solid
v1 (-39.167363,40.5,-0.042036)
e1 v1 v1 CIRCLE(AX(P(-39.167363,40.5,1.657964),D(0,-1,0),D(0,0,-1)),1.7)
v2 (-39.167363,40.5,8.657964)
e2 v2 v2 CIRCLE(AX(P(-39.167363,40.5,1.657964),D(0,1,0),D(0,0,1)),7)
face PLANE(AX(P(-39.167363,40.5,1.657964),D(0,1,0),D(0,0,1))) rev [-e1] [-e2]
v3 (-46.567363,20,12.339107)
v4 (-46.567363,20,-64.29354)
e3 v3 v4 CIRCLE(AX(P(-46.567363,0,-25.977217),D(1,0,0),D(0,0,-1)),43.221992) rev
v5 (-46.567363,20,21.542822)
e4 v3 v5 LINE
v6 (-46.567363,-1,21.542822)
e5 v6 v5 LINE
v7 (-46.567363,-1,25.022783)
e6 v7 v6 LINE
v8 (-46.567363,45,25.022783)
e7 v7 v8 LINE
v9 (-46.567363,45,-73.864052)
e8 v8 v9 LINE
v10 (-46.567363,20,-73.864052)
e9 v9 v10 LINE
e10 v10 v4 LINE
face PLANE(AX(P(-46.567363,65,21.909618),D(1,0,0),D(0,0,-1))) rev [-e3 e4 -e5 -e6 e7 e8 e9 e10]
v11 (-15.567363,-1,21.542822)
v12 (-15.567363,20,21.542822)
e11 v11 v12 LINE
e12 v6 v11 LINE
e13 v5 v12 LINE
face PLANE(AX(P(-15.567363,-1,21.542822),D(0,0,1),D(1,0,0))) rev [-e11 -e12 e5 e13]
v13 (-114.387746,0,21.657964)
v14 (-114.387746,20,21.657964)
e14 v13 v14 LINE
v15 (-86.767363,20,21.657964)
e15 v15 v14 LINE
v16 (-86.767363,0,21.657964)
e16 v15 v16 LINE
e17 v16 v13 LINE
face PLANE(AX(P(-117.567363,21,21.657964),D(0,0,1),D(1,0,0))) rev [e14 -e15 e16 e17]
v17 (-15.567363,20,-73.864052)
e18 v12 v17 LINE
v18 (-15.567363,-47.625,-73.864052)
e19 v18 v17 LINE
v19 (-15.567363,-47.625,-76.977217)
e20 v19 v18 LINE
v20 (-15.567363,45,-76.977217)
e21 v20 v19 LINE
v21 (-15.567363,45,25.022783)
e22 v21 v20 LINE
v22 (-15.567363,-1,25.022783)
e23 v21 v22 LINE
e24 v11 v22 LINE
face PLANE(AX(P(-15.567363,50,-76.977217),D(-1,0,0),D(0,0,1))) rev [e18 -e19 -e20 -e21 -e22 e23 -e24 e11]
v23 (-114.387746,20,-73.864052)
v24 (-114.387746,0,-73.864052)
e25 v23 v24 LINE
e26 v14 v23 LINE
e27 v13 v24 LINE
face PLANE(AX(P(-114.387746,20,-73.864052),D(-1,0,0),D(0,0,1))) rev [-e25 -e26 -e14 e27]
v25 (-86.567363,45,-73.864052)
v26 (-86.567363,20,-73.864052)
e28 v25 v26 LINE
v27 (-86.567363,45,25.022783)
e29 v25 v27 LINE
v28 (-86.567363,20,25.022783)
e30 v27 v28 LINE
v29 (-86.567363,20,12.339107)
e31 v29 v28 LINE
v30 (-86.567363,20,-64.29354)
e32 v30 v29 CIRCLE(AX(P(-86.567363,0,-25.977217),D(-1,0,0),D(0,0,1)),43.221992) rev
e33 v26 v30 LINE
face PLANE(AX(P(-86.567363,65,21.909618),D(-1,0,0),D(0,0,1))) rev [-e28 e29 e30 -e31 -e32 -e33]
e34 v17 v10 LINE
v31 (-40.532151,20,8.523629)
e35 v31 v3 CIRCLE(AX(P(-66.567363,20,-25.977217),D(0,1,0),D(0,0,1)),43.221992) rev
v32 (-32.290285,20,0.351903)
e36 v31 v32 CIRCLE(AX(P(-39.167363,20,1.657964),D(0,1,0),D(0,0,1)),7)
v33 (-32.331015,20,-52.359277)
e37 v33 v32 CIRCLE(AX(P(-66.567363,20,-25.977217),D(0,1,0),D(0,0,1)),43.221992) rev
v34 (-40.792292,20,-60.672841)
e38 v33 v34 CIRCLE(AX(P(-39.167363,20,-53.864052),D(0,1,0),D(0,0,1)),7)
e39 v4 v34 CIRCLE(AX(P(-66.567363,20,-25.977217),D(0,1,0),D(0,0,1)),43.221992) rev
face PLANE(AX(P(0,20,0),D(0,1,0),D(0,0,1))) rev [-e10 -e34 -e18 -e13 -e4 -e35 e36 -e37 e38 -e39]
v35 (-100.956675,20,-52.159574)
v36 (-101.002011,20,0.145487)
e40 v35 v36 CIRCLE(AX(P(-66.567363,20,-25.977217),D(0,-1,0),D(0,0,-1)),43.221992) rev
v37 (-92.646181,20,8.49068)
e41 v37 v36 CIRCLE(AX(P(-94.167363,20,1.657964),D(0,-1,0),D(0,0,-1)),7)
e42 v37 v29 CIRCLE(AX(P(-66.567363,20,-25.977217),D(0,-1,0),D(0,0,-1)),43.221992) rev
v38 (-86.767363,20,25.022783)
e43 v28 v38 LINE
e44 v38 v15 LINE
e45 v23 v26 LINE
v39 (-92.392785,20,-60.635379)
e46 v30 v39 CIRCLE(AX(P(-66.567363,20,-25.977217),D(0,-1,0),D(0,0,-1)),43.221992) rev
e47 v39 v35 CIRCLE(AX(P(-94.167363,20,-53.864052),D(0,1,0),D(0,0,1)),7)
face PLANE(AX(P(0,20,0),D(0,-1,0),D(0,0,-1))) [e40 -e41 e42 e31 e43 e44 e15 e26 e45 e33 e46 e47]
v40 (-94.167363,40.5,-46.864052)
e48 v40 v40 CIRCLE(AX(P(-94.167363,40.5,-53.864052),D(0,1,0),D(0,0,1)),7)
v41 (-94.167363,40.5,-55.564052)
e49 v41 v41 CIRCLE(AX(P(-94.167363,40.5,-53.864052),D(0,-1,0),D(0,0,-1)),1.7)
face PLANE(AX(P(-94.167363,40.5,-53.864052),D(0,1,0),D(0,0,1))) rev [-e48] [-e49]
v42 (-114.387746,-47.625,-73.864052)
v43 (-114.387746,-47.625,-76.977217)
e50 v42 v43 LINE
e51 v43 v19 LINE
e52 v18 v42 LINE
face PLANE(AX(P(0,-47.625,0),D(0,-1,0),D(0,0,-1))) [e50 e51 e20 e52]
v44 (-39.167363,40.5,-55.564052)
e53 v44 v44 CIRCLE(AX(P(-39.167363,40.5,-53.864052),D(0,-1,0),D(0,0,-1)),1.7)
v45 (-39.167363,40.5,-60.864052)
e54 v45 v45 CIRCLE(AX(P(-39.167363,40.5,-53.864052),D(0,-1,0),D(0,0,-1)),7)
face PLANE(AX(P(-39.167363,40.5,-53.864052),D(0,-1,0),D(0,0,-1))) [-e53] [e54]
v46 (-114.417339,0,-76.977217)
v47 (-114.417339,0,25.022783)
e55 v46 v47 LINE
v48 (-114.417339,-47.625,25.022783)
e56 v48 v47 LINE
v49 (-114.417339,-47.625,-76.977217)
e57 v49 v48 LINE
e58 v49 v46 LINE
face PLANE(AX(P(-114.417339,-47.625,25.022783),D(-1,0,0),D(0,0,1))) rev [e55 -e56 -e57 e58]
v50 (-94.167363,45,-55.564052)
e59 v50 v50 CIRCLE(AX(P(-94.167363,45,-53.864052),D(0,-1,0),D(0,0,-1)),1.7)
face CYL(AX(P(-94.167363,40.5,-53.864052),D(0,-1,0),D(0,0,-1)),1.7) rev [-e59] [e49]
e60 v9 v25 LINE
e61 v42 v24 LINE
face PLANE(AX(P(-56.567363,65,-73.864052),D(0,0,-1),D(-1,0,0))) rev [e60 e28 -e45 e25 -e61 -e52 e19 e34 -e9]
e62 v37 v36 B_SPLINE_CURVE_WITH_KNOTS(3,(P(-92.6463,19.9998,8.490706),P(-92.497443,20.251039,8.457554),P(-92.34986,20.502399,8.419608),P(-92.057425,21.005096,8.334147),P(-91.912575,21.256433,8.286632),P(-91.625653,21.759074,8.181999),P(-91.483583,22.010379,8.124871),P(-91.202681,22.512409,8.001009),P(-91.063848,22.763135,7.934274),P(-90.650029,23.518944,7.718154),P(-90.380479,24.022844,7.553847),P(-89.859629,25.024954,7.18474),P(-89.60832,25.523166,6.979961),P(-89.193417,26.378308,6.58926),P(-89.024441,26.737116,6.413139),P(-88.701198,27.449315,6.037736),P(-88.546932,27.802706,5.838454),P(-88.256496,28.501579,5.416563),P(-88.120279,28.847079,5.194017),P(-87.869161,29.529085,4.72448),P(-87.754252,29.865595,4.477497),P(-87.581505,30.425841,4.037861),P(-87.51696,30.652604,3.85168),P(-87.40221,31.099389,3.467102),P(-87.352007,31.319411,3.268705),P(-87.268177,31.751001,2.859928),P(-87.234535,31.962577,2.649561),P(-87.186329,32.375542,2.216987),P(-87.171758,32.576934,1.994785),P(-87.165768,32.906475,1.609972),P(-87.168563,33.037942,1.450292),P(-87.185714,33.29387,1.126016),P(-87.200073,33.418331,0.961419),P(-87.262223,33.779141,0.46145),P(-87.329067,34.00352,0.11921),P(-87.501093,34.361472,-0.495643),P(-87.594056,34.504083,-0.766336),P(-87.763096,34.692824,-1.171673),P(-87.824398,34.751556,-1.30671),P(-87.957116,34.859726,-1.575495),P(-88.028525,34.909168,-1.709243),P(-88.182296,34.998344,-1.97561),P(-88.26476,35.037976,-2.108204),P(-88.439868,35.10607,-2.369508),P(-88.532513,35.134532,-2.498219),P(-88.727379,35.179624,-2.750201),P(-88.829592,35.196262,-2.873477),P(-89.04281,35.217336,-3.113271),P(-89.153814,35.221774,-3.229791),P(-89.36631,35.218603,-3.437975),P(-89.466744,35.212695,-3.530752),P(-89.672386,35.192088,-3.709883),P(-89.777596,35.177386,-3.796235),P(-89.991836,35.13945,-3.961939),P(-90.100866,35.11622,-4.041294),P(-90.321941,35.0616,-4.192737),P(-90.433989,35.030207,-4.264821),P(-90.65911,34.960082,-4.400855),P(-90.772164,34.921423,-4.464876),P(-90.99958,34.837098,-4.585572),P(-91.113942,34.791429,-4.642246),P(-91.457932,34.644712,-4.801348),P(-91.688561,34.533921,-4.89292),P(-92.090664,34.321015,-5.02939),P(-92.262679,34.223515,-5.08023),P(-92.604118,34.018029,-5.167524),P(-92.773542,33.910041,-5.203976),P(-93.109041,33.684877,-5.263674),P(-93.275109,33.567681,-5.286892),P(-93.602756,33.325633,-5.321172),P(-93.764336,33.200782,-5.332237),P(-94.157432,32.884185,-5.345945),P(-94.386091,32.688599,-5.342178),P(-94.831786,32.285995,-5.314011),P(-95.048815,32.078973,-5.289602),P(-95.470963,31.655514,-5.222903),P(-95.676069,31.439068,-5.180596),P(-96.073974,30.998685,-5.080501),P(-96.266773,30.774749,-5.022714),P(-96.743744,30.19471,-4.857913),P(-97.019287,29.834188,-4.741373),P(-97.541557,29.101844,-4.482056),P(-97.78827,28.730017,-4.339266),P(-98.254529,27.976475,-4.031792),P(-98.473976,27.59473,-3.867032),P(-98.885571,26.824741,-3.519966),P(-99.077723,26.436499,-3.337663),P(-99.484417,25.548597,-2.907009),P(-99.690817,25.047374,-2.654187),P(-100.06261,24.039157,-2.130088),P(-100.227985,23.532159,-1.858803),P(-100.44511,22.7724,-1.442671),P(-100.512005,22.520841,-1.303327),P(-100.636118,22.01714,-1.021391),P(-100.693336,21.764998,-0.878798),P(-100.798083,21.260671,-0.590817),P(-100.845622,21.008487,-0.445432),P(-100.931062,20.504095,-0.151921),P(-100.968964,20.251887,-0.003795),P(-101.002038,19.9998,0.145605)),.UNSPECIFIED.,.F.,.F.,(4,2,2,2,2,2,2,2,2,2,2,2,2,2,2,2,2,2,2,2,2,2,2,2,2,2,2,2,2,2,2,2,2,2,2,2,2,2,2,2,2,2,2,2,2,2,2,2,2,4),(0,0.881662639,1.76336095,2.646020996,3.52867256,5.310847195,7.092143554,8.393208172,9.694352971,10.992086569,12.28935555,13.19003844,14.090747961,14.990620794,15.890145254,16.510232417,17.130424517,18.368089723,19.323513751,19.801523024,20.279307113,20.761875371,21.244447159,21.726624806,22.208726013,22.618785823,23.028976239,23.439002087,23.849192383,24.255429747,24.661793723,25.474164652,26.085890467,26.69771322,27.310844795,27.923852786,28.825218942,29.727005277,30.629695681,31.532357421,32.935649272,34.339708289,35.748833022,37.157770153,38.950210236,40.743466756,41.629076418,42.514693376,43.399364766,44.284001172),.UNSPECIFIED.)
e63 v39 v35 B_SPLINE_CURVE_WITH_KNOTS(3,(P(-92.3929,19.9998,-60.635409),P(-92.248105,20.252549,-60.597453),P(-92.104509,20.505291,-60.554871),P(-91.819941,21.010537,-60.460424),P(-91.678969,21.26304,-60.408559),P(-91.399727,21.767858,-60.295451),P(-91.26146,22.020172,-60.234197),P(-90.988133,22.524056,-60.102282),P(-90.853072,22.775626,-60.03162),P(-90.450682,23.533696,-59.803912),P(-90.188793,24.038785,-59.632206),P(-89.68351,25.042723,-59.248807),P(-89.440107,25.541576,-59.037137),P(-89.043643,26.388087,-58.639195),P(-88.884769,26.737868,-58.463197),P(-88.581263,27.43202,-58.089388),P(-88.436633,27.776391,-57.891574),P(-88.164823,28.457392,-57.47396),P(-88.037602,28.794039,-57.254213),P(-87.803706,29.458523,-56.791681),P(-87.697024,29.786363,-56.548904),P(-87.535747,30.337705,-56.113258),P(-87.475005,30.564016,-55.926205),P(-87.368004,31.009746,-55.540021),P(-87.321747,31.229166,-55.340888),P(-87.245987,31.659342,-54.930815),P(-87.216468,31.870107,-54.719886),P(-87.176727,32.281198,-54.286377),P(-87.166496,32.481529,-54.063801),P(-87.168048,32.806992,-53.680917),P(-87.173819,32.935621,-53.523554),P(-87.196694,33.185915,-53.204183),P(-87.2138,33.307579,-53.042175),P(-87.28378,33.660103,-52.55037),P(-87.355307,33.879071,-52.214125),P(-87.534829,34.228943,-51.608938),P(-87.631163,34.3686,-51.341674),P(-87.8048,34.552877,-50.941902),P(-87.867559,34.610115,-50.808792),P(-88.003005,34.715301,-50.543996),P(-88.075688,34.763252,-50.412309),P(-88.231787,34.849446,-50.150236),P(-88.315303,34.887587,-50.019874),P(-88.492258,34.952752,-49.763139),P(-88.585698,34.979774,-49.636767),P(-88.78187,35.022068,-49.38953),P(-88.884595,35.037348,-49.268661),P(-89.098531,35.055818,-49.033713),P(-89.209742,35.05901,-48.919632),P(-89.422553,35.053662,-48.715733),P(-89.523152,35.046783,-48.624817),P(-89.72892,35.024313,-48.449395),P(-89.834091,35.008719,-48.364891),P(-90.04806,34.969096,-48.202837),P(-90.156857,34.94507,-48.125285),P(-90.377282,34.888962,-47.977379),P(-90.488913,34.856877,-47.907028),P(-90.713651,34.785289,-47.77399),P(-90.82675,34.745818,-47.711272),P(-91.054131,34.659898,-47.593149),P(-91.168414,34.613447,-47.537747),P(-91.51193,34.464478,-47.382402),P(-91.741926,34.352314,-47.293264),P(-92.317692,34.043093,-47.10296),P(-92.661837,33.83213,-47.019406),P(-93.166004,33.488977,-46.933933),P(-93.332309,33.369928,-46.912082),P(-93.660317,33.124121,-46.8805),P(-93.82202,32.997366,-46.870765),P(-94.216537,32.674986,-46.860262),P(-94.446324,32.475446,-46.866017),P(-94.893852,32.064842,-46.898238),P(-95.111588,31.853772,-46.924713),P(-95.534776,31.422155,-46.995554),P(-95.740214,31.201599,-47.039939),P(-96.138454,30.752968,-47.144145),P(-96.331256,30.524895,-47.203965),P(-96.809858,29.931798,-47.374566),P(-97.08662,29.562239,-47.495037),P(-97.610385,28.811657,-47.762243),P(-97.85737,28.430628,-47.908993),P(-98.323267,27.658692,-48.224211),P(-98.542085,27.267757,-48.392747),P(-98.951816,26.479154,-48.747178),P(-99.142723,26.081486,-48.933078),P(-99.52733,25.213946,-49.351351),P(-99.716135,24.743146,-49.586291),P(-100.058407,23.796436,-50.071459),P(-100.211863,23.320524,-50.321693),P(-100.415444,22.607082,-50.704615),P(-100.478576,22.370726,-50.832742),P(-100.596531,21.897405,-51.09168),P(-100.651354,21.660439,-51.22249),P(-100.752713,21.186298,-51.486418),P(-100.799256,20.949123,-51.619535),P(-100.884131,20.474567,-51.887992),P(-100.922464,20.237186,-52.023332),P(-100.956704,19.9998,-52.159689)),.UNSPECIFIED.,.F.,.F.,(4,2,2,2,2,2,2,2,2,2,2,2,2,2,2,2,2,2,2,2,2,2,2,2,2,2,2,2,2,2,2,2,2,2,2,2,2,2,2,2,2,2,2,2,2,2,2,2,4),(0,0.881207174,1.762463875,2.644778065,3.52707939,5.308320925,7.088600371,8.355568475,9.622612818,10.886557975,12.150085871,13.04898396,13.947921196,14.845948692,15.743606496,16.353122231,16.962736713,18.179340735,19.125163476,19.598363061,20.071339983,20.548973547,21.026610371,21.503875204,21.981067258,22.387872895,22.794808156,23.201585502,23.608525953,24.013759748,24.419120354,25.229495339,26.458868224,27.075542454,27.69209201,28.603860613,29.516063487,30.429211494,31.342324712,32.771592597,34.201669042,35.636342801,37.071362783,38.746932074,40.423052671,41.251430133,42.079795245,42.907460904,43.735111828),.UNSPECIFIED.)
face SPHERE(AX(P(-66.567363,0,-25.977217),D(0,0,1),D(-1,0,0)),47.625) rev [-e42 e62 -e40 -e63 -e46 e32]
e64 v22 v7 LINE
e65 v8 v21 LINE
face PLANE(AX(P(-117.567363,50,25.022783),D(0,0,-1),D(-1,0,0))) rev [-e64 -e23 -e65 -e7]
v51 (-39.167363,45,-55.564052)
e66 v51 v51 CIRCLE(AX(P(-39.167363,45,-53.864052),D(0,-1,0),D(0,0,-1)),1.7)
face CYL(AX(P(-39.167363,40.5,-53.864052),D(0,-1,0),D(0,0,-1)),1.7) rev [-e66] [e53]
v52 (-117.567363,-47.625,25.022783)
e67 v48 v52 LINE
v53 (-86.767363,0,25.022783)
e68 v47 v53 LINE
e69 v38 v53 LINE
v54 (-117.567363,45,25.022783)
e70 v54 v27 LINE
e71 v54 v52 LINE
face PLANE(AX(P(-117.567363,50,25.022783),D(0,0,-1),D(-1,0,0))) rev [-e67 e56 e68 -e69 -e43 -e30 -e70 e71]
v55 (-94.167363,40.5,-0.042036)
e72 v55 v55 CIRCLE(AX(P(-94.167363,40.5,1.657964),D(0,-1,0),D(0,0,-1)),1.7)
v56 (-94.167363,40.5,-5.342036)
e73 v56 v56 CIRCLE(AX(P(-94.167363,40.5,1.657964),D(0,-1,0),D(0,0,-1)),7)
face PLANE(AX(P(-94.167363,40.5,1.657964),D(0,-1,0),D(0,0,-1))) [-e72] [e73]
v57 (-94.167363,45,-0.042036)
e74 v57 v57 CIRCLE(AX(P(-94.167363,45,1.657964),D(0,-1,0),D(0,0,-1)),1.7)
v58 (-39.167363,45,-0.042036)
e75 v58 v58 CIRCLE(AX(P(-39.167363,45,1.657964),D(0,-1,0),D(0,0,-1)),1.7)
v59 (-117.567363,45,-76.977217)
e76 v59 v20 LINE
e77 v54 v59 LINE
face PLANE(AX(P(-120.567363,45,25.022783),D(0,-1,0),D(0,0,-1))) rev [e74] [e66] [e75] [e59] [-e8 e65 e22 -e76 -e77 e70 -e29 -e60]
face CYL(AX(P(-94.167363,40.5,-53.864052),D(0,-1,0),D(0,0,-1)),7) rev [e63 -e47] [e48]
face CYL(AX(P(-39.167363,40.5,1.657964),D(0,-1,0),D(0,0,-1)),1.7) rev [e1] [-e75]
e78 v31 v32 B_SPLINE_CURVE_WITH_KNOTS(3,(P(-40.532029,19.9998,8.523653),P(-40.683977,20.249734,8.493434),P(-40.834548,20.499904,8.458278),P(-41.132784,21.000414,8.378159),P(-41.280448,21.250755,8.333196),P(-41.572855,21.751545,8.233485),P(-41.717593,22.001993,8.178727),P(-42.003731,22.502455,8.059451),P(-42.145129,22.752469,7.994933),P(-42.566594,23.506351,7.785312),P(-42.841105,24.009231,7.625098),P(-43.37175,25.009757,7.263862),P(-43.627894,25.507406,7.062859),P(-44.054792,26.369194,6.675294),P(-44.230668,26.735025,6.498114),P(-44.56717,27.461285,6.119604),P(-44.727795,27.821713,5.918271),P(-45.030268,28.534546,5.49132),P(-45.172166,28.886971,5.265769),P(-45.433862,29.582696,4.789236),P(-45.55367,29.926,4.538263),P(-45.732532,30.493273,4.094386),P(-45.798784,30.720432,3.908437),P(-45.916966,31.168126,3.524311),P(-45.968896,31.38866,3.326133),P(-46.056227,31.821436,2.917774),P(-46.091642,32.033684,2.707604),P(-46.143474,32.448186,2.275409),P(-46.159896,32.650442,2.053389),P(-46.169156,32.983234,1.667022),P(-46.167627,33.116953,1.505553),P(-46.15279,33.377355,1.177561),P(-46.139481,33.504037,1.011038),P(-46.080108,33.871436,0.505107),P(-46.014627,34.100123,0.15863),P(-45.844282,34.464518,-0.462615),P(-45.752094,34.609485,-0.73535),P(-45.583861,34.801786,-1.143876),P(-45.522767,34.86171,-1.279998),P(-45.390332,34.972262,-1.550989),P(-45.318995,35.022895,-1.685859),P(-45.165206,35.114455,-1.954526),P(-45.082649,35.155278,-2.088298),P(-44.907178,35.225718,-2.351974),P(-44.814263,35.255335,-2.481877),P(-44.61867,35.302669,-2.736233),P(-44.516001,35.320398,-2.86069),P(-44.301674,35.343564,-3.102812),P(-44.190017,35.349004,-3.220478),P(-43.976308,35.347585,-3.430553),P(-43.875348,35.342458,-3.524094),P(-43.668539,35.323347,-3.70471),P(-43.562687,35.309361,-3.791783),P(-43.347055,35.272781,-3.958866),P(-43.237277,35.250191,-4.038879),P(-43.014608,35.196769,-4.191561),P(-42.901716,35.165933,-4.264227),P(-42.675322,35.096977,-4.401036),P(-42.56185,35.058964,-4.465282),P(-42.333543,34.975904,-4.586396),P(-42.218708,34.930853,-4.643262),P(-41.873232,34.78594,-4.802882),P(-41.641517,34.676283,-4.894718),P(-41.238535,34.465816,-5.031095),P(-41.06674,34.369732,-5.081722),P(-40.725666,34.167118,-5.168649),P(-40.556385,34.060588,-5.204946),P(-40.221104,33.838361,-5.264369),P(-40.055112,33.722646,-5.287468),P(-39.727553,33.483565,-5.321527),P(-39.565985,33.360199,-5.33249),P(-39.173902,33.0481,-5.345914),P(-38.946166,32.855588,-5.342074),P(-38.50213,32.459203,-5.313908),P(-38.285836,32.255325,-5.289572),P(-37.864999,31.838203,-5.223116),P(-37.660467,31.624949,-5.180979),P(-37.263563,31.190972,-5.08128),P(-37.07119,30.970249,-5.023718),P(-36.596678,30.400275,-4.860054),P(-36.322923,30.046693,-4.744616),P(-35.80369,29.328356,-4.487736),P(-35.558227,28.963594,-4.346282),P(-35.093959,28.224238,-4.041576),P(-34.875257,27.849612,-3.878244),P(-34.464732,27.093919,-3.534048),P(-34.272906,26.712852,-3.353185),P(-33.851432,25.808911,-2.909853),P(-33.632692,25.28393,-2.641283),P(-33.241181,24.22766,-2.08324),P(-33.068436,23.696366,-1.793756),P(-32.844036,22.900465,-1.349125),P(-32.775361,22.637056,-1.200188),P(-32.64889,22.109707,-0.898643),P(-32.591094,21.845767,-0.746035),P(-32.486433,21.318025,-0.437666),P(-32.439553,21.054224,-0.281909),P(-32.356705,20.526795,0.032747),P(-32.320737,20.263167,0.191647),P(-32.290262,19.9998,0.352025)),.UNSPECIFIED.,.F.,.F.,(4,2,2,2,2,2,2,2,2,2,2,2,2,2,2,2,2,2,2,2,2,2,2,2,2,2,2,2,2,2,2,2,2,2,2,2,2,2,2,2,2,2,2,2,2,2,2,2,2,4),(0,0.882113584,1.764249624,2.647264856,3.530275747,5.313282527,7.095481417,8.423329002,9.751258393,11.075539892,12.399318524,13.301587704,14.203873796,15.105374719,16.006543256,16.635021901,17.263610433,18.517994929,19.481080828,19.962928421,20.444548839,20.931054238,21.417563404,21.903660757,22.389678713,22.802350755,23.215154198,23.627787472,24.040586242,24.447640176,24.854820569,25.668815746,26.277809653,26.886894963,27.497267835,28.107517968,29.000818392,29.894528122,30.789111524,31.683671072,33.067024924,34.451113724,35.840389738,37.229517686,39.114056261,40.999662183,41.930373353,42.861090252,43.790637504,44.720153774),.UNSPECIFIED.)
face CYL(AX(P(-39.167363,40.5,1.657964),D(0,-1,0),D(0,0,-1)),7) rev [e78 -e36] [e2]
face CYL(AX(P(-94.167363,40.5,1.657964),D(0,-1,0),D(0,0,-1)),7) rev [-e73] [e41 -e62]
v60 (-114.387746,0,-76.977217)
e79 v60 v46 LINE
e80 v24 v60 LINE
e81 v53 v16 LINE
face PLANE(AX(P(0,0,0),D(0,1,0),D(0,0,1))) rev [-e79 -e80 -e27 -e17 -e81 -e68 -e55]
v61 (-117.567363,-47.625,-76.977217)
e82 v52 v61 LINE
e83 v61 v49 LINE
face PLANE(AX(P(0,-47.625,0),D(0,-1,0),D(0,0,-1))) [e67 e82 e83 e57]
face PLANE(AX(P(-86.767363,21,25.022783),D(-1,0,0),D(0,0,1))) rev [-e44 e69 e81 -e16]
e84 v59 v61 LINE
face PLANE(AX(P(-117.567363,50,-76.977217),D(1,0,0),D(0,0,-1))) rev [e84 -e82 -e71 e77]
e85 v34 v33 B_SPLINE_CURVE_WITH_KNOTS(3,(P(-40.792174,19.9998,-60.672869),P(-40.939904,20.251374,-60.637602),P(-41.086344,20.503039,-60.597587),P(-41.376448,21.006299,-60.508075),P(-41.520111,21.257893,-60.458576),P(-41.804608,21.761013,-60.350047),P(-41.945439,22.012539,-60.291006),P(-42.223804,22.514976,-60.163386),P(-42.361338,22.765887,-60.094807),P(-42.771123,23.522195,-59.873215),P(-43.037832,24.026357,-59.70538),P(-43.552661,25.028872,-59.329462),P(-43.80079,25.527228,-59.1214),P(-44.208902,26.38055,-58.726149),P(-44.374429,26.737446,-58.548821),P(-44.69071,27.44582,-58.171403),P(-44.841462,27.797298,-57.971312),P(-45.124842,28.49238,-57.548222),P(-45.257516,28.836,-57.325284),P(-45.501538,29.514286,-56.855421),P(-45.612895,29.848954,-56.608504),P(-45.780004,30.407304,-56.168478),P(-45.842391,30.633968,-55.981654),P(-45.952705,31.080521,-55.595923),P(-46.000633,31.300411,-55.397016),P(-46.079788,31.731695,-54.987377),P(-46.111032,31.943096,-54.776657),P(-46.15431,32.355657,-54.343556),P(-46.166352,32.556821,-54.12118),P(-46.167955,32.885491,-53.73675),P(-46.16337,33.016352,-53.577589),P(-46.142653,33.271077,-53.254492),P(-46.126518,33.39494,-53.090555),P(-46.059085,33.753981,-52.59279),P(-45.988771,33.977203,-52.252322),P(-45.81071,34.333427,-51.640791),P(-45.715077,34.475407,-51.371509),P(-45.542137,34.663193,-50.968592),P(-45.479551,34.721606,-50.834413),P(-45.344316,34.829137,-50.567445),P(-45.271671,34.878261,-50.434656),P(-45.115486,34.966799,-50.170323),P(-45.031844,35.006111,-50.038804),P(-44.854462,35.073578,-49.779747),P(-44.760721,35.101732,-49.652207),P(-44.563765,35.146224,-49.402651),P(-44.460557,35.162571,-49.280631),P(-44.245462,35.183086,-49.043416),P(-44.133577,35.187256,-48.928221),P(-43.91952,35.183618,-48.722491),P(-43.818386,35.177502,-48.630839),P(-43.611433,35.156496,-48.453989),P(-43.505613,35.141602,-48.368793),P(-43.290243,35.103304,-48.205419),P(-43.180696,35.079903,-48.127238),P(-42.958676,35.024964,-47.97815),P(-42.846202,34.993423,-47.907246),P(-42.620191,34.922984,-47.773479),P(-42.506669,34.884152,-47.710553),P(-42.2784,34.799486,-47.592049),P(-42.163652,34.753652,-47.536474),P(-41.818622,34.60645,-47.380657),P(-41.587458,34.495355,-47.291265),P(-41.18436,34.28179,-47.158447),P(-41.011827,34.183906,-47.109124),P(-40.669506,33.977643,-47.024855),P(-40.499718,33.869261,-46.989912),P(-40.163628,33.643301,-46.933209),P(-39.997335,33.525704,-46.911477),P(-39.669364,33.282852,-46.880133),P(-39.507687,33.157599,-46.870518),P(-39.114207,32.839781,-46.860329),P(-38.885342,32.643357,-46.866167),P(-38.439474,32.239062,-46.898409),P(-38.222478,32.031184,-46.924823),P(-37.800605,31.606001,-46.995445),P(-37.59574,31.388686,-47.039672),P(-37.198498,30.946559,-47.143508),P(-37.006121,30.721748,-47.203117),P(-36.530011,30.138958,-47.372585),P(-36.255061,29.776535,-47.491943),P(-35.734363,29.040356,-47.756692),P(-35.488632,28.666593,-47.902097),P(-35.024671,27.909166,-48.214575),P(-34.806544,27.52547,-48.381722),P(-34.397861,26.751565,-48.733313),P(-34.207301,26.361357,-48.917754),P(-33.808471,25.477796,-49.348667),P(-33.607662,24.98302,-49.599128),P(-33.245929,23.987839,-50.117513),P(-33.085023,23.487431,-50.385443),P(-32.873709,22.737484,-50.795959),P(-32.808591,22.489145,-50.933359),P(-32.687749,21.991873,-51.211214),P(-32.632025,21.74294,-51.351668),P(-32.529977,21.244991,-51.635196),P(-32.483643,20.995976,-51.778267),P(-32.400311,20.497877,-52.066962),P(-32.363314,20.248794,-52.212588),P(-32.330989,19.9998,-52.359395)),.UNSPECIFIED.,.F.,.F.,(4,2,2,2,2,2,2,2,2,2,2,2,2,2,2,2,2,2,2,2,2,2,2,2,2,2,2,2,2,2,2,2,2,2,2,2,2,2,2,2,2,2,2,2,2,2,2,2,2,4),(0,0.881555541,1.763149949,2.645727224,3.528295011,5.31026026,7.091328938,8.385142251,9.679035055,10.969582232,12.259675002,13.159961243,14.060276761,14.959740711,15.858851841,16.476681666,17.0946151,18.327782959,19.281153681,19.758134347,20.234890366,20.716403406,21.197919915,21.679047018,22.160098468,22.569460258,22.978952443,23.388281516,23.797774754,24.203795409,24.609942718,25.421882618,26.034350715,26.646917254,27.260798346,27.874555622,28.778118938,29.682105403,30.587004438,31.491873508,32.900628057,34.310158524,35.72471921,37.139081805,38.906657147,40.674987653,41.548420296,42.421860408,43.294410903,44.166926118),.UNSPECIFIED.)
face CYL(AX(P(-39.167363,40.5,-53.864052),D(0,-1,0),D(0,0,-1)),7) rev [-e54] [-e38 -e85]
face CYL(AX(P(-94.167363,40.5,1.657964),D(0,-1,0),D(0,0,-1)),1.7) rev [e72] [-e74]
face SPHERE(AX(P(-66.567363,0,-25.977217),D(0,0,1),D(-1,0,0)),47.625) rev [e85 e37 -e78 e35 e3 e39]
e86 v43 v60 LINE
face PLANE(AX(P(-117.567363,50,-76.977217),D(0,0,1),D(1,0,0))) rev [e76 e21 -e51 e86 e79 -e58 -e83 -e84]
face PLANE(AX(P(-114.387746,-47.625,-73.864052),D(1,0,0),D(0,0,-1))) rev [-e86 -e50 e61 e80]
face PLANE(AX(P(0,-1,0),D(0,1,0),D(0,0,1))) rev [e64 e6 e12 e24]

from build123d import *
from build123d.topology import SkipClean

# Parameters (mm, degrees)
SKETCH1_W                   = 102
SKETCH1_H                   = 102
BOSS_EXTRUDE1_DEPTH         = 50
CUT_EXTRUDE_THIN1_OUTLINE_W = 40
CUT_EXTRUDE_THIN1_OUTLINE_H = 95.773670058
CUT_EXTRUDE_THIN1_DEPTH     = 50
SKETCH4_W                   = 40
SKETCH4_H                   = 6.202657501
CUT_EXTRUDE3_DEPTH          = 54
SKETCH5_W                   = 33.817621941
SKETCH5_H                   = 102.594578927
CUT_EXTRUDE4_DEPTH          = 20
SKETCH6_W                   = 27.820383201
SKETCH6_H                   = 98.886835029
CUT_EXTRUDE5_DEPTH          = 20
SKETCH7_W                   = 30.8
SKETCH7_H                   = 3.364819678
BOSS_EXTRUDE2_DEPTH         = 21
SKETCH9_W                   = 31
SKETCH9_H                   = 3.479961613
BOSS_EXTRUDE4_DEPTH         = 21
SKETCH10_W                  = 3.15002448
SKETCH10_H                  = 102
BOSS_EXTRUDE5_DEPTH         = 47.625
SKETCH11_W                  = 98.820383201
SKETCH11_H                  = 3.113164971
BOSS_EXTRUDE6_DEPTH         = 47.625
SKETCH14_W                  = 102
SKETCH14_H                  = 5
CUT_EXTRUDE7_DEPTH          = 105
SKETCH17_R                  = 7
CUT_EXTRUDE12_DEPTH         = 20.5
M3_CLEARANCE_HOLE1_D        = 3.4


# Read off the part's stored shape, not the designer's step: Cut-Extrude-Thin1
with BuildPart() as part:
    # Sketch1 → Boss-Extrude1 (new body)
    with BuildSketch(Plane(origin=(0, 0, 0), x_dir=(1, 0, 0), z_dir=(0, 1, 0))):
        with Locations((-66.567363259, 25.977216604)):
            Rectangle(SKETCH1_W, SKETCH1_H)
    extrude(amount=BOSS_EXTRUDE1_DEPTH)

    # Sketch2 → Cut-Revolve1 (revolve, cut)
    with SkipClean():  # the faces are left unmerged after this step: merging them gives an invalid solid
        with BuildSketch(Plane(origin=(0, 0, 0), x_dir=(1, 0, 0), z_dir=(0, 1, 0))):
            with BuildLine():
                ThreePointArc((-66.567363259, 73.602216604), (-114.192363259, 25.977216604), (-66.567363259, -21.647783396))
                Line((-66.567363259, -21.647783396), (-66.567363259, 73.602216604))
            make_face()
            with BuildLine():
                Line((-66.567363259, 73.602216604), (-66.567363259, -21.647783396))
                ThreePointArc((-66.567363259, -21.647783396), (-32.891402805, -7.69874385), (-18.942363259, 25.977216604))
                ThreePointArc((-18.942363259, 25.977216604), (-32.891402805, 59.653177058), (-66.567363259, 73.602216604))
            make_face()
        revolve(axis=Axis((-66.567363259, 0, 21.647783396), (0, 0, -1)), mode=Mode.SUBTRACT)
    add(part.part.scale(1), mode=Mode.REPLACE)  # the faces are merged on a copy

    # Cut-Extrude-Thin1 outline → Cut-Extrude-Thin1 (cut)
    with BuildSketch(Plane(origin=(0, 0, 0), x_dir=(1, 0, 0), z_dir=(0, 1, 0))):
        with Locations((-66.567363259, 25.977216604)):
            Rectangle(CUT_EXTRUDE_THIN1_OUTLINE_W, CUT_EXTRUDE_THIN1_OUTLINE_H)
    extrude(amount=CUT_EXTRUDE_THIN1_DEPTH, mode=Mode.SUBTRACT)

    # Sketch4 → Cut-Extrude3 (cut)
    with BuildSketch(Plane(origin=(0, 0, 0), x_dir=(1, 0, 0), z_dir=(0, 1, 0))):
        with Locations((-66.567363259, -25.010947176)):
            Rectangle(SKETCH4_W, SKETCH4_H)
    extrude(amount=CUT_EXTRUDE3_DEPTH, mode=Mode.SUBTRACT)

    # Sketch5 → Cut-Extrude4 (cut)
    with BuildSketch(Plane(origin=(0, 0, 0), x_dir=(1, 0, 0), z_dir=(0, 1, 0))):
        with Locations((-29.658552289, 22.56676217)):
            Rectangle(SKETCH5_W, SKETCH5_H)
    extrude(amount=CUT_EXTRUDE4_DEPTH, mode=Mode.SUBTRACT)

    # Sketch6 → Cut-Extrude5 (cut)
    with BuildSketch(Plane(origin=(0, 0, 0), x_dir=(-1, 0, 0), z_dir=(0, -1, 0))):
        with Locations((100.47755486, 24.420634119)):
            Rectangle(SKETCH6_W, SKETCH6_H)
    extrude(amount=-CUT_EXTRUDE5_DEPTH, mode=Mode.SUBTRACT)

    # Sketch7 → Boss-Extrude2 (add)
    with BuildSketch(Plane(origin=(0, 0, 0), x_dir=(1, 0, 0), z_dir=(0, 1, 0))):
        with Locations((-102.167363259, -23.340373557)):
            Rectangle(SKETCH7_W, SKETCH7_H)
    extrude(amount=BOSS_EXTRUDE2_DEPTH)

    # Sketch9 → Boss-Extrude4 (add)
    with BuildSketch(Plane.XZ.offset(-20)):
        with Locations((-31.067363259, 23.28280259)):
            Rectangle(SKETCH9_W, SKETCH9_H)
    extrude(amount=BOSS_EXTRUDE4_DEPTH)

    # Sketch10 → Boss-Extrude5 (add)
    with BuildSketch(Plane.XZ):
        with Locations((-115.992351019, -25.977216604)):
            Rectangle(SKETCH10_W, SKETCH10_H)
    extrude(amount=BOSS_EXTRUDE5_DEPTH)

    # Sketch11 → Boss-Extrude6 (add)
    with BuildSketch(Plane.XZ):
        with Locations((-64.97755486, -75.420634119)):
            Rectangle(SKETCH11_W, SKETCH11_H)
    extrude(amount=BOSS_EXTRUDE6_DEPTH)

    # Sketch14 → Cut-Extrude7 (cut)
    with BuildSketch(Plane(origin=(-15.567363259, 0, 0), x_dir=(0, 0, -1), z_dir=(1, 0, 0))):
        with Locations((25.977216604, 47.5)):
            Rectangle(SKETCH14_W, SKETCH14_H)
    extrude(amount=-CUT_EXTRUDE7_DEPTH, mode=Mode.SUBTRACT)

    # Sketch17 → Cut-Extrude12 (cut)
    with BuildSketch(Plane.XZ.offset(-20)):
        with Locations(Location((-94.167363259, 1.657963718, 0), (0, 0, 270))):
            Circle(SKETCH17_R)
        with Locations(Location((-94.167363259, -53.864051633, 0), (0, 0, 284.685382437))):
            Circle(SKETCH17_R)
        with Locations(Location((-39.167363259, 1.657963718, 0), (0, 0, 349.246729183))):
            Circle(SKETCH17_R)
        with Locations(Location((-39.167363259, -53.864051633, 0), (0, 0, 270))):
            Circle(SKETCH17_R)
    extrude(amount=-CUT_EXTRUDE12_DEPTH, mode=Mode.SUBTRACT)

    # M3 Clearance Hole1 (through all)
    with Locations(Plane(origin=(0, 40.5, 0), x_dir=(-1, 0, 0), z_dir=(0, -1, 0))):
        with Locations((94.167363259, -1.657963718), (39.167363259, -1.657963718), (39.167363259, 53.864051633), (94.167363259, 53.864051633)):
            Hole(M3_CLEARANCE_HOLE1_D / 2)


solid = part.part
